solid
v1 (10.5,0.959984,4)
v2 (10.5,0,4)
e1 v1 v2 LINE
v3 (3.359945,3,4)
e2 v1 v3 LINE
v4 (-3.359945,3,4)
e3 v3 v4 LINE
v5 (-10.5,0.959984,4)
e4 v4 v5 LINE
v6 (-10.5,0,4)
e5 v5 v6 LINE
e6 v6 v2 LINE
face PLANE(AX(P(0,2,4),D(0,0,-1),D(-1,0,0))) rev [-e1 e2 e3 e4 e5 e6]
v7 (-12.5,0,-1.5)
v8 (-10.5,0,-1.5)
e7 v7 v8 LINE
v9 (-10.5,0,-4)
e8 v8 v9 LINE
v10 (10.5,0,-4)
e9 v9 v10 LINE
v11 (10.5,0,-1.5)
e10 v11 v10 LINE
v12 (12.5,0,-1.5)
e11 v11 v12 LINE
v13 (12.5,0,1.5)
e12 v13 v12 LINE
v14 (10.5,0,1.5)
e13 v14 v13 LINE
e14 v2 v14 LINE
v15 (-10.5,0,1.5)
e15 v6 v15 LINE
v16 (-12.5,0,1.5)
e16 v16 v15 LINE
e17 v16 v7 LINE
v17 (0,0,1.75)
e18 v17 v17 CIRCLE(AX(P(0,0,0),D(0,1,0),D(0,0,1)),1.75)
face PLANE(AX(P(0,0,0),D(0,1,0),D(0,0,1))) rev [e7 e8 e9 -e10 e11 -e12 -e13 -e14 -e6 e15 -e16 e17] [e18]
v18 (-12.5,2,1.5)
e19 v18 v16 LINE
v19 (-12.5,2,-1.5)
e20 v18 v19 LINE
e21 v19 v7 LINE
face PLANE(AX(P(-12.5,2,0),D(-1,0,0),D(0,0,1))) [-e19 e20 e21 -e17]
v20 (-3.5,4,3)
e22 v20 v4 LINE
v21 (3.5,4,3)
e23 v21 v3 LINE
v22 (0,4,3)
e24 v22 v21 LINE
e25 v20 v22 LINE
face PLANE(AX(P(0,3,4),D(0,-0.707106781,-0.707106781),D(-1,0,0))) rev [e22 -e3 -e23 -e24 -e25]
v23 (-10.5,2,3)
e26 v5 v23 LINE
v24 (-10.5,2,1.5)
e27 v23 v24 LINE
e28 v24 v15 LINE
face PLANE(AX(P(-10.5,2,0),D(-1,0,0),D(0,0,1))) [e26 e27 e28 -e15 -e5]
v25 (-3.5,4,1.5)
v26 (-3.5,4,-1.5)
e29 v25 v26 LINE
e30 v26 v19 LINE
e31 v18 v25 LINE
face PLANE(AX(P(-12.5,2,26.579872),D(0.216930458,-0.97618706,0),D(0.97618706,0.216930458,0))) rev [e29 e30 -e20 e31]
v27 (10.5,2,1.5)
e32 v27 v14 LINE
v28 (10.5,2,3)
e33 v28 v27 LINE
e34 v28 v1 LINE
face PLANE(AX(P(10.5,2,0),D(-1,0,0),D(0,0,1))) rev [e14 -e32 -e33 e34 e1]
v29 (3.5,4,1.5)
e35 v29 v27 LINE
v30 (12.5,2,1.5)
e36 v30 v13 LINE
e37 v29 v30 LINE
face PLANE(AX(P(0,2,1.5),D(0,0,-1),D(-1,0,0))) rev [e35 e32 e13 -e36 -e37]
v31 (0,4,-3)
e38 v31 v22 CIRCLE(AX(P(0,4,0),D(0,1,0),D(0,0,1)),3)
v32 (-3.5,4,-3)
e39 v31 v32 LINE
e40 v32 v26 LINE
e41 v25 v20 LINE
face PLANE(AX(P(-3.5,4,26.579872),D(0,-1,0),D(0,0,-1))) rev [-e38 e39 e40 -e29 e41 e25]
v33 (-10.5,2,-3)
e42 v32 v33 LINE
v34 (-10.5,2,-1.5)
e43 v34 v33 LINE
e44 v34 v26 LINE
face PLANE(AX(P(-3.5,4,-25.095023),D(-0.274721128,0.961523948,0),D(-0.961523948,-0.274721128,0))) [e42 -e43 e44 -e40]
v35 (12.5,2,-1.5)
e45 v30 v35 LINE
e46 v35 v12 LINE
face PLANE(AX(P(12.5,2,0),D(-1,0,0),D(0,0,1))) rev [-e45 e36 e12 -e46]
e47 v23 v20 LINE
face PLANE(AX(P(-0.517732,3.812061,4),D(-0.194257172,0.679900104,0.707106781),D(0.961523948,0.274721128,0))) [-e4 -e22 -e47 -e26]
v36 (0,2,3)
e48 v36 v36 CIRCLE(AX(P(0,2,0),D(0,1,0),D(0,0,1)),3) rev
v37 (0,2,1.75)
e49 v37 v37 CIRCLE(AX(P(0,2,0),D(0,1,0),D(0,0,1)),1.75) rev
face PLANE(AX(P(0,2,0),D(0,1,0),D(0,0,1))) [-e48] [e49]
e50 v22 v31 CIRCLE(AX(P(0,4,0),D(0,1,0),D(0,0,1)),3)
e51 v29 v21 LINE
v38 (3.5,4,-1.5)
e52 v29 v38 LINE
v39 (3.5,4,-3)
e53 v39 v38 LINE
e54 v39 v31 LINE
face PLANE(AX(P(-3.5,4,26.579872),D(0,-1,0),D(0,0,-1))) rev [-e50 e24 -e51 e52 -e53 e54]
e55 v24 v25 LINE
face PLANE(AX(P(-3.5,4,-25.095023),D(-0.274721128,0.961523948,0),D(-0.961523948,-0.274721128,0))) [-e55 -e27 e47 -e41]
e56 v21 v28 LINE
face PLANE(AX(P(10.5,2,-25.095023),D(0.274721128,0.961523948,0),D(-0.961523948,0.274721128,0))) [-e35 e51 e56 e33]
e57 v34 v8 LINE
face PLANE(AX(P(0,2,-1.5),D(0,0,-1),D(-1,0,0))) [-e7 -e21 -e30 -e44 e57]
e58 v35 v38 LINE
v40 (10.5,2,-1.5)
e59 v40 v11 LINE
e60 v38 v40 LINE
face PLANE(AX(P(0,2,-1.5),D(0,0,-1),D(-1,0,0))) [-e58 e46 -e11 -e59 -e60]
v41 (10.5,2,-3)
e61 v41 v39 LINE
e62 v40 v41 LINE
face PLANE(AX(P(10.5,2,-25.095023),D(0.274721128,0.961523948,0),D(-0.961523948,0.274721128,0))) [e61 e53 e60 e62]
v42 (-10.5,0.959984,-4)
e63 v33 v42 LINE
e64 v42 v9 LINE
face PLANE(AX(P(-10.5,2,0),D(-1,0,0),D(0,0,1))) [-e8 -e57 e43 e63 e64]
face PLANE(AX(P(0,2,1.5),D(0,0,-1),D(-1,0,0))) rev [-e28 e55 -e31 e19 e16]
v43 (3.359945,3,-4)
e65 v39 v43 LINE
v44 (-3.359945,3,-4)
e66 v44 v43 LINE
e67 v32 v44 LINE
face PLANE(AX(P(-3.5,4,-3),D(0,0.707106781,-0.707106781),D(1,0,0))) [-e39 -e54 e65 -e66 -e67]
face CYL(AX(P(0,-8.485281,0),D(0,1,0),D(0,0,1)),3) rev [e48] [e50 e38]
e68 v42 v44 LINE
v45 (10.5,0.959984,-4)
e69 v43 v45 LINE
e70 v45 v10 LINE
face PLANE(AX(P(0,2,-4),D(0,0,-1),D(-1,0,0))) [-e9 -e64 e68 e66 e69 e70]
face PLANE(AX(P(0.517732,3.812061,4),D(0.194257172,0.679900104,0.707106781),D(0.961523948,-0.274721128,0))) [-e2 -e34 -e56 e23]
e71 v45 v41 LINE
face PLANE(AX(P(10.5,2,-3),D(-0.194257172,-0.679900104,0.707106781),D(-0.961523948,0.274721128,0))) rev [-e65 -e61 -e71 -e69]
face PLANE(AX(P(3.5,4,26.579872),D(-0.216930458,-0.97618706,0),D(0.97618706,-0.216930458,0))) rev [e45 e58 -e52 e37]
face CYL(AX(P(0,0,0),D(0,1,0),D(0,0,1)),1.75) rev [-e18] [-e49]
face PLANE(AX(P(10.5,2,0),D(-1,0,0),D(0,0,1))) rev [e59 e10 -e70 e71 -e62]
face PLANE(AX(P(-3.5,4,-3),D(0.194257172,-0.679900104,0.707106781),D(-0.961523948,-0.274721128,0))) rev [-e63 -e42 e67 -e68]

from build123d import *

# Parameters (mm, degrees)
SKETCH1_W                       = 21
SKETCH1_H                       = 2.5
SKETCH1_H_2                     = 3
SKETCH1_W_2                     = 2
BOSS_EXTRUDE1_DEPTH             = 2
BOSS_EXTRUDE2_REACH             = 15.276
BOSS_EXTRUDE2_DIRECTION_2_REACH = 15.276
BOSS_EXTRUDE3_REACH             = 17.37
SKETCH5_R                       = 1.75
CUT_EXTRUDE1_DEPTH              = 14.720422734
SKETCH6_R                       = 3
CUT_EXTRUDE2_DEPTH              = 2
CHAMFER1_SIZE                   = 1


with BuildPart() as part:
    # Sketch1 → Boss-Extrude1 (new body)
    with BuildSketch(Plane(origin=(0, 0, 0), x_dir=(1, 0, 0), z_dir=(0, 1, 0))):
        with Locations((0, -2.75)):
            Rectangle(SKETCH1_W, SKETCH1_H)
        Rectangle(SKETCH1_W, SKETCH1_H_2)
        with Locations((-11.5, 0)):
            Rectangle(SKETCH1_W_2, SKETCH1_H_2)
        with Locations((11.5, 0)):
            Rectangle(SKETCH1_W_2, SKETCH1_H_2)
        with Locations((0, 2.75)):
            Rectangle(SKETCH1_W, SKETCH1_H)
    extrude(amount=BOSS_EXTRUDE1_DEPTH)

    # Boss-Extrude2: up to this face of the body (flat: up to its plane)
    boss_extrude2_end = Plane(part.part.faces().sort_by_distance((-11.5, 1, 1.5))[0])
    # Sketch3 → Boss-Extrude2 (add, up to the picked face)
    with BuildSketch(Plane.XY, mode=Mode.PRIVATE) as boss_extrude2_sk1:
        Polygon((-12.5, 2), (-3.5, 4), (3.5, 4), (12.5, 2), align=None)
    boss_extrude2_tool1 = split(extrude(boss_extrude2_sk1.sketch, amount=BOSS_EXTRUDE2_REACH, mode=Mode.PRIVATE), bisect_by=boss_extrude2_end, keep=Keep.BOTH, mode=Mode.PRIVATE)
    add(boss_extrude2_tool1.solids().sort_by(Axis((0, 2.8125, 0), (0, 0, 1)))[0])

    # Boss-Extrude2 direction 2: up to this face of the body (flat: up to its plane)
    boss_extrude2_direction_2_end = Plane(part.part.faces().sort_by_distance((-11.5, 1, -1.5))[0])
    # Sketch3 → Boss-Extrude2 direction 2 (add, up to the picked face)
    with BuildSketch(Plane.XY, mode=Mode.PRIVATE) as boss_extrude2_direction_2_sk1:
        Polygon((-12.5, 2), (-3.5, 4), (3.5, 4), (12.5, 2), align=None)
    boss_extrude2_direction_2_tool1 = split(extrude(boss_extrude2_direction_2_sk1.sketch, amount=-BOSS_EXTRUDE2_DIRECTION_2_REACH, mode=Mode.PRIVATE), bisect_by=boss_extrude2_direction_2_end, keep=Keep.BOTH, mode=Mode.PRIVATE)
    add(boss_extrude2_direction_2_tool1.solids().sort_by(Axis((0, 2.8125, 0), (0, 0, -1)))[0])

    # Boss-Extrude3: up to this face of the body (flat: up to its plane)
    boss_extrude3_end = Plane(part.part.faces().sort_by_distance((0, 1, -4))[0])
    # Sketch4 → Boss-Extrude3 (add, up to the picked face)
    with BuildSketch(Plane.XY.offset(4), mode=Mode.PRIVATE) as boss_extrude3_sk1:
        Polygon((10.5, 2), (3.5, 4), (-3.5, 4), (-10.5, 2), align=None)
    boss_extrude3_tool1 = split(extrude(boss_extrude3_sk1.sketch, amount=-BOSS_EXTRUDE3_REACH, mode=Mode.PRIVATE), bisect_by=boss_extrude3_end, keep=Keep.BOTH, mode=Mode.PRIVATE)
    add(boss_extrude3_tool1.solids().sort_by(Axis((0, 2.833333, 4), (0, 0, -1)))[0])

    # Sketch5 → Cut-Extrude1 (cut, through all)
    with BuildSketch(Plane(origin=(0, 4, 0), x_dir=(1, 0, 0), z_dir=(0, 1, 0))):
        with Locations(Location((0, 0, 0), (0, 0, 270))):
            Circle(SKETCH5_R)
    extrude(amount=-CUT_EXTRUDE1_DEPTH, mode=Mode.SUBTRACT)

    # Sketch6 → Cut-Extrude2 (cut)
    with BuildSketch(Plane(origin=(0, 4, 0), x_dir=(1, 0, 0), z_dir=(0, 1, 0))):
        with Locations(Location((0, 0, 0), (0, 0, 270))):
            Circle(SKETCH6_R)
    extrude(amount=-CUT_EXTRUDE2_DEPTH, mode=Mode.SUBTRACT)

    # Chamfer1
    chamfer1_edges = [part.edges().sort_by_distance(p)[0] for p in [
        (7, 3, 4),
        (0, 4, 4),
        (-7, 3, 4),
        (7, 3, -4),
        (0, 4, -4),
        (-7, 3, -4),
    ]]
    chamfer(chamfer1_edges, length=CHAMFER1_SIZE - 0.0001)  # a hair under: the kernel refuses the full size


solid = part.part
